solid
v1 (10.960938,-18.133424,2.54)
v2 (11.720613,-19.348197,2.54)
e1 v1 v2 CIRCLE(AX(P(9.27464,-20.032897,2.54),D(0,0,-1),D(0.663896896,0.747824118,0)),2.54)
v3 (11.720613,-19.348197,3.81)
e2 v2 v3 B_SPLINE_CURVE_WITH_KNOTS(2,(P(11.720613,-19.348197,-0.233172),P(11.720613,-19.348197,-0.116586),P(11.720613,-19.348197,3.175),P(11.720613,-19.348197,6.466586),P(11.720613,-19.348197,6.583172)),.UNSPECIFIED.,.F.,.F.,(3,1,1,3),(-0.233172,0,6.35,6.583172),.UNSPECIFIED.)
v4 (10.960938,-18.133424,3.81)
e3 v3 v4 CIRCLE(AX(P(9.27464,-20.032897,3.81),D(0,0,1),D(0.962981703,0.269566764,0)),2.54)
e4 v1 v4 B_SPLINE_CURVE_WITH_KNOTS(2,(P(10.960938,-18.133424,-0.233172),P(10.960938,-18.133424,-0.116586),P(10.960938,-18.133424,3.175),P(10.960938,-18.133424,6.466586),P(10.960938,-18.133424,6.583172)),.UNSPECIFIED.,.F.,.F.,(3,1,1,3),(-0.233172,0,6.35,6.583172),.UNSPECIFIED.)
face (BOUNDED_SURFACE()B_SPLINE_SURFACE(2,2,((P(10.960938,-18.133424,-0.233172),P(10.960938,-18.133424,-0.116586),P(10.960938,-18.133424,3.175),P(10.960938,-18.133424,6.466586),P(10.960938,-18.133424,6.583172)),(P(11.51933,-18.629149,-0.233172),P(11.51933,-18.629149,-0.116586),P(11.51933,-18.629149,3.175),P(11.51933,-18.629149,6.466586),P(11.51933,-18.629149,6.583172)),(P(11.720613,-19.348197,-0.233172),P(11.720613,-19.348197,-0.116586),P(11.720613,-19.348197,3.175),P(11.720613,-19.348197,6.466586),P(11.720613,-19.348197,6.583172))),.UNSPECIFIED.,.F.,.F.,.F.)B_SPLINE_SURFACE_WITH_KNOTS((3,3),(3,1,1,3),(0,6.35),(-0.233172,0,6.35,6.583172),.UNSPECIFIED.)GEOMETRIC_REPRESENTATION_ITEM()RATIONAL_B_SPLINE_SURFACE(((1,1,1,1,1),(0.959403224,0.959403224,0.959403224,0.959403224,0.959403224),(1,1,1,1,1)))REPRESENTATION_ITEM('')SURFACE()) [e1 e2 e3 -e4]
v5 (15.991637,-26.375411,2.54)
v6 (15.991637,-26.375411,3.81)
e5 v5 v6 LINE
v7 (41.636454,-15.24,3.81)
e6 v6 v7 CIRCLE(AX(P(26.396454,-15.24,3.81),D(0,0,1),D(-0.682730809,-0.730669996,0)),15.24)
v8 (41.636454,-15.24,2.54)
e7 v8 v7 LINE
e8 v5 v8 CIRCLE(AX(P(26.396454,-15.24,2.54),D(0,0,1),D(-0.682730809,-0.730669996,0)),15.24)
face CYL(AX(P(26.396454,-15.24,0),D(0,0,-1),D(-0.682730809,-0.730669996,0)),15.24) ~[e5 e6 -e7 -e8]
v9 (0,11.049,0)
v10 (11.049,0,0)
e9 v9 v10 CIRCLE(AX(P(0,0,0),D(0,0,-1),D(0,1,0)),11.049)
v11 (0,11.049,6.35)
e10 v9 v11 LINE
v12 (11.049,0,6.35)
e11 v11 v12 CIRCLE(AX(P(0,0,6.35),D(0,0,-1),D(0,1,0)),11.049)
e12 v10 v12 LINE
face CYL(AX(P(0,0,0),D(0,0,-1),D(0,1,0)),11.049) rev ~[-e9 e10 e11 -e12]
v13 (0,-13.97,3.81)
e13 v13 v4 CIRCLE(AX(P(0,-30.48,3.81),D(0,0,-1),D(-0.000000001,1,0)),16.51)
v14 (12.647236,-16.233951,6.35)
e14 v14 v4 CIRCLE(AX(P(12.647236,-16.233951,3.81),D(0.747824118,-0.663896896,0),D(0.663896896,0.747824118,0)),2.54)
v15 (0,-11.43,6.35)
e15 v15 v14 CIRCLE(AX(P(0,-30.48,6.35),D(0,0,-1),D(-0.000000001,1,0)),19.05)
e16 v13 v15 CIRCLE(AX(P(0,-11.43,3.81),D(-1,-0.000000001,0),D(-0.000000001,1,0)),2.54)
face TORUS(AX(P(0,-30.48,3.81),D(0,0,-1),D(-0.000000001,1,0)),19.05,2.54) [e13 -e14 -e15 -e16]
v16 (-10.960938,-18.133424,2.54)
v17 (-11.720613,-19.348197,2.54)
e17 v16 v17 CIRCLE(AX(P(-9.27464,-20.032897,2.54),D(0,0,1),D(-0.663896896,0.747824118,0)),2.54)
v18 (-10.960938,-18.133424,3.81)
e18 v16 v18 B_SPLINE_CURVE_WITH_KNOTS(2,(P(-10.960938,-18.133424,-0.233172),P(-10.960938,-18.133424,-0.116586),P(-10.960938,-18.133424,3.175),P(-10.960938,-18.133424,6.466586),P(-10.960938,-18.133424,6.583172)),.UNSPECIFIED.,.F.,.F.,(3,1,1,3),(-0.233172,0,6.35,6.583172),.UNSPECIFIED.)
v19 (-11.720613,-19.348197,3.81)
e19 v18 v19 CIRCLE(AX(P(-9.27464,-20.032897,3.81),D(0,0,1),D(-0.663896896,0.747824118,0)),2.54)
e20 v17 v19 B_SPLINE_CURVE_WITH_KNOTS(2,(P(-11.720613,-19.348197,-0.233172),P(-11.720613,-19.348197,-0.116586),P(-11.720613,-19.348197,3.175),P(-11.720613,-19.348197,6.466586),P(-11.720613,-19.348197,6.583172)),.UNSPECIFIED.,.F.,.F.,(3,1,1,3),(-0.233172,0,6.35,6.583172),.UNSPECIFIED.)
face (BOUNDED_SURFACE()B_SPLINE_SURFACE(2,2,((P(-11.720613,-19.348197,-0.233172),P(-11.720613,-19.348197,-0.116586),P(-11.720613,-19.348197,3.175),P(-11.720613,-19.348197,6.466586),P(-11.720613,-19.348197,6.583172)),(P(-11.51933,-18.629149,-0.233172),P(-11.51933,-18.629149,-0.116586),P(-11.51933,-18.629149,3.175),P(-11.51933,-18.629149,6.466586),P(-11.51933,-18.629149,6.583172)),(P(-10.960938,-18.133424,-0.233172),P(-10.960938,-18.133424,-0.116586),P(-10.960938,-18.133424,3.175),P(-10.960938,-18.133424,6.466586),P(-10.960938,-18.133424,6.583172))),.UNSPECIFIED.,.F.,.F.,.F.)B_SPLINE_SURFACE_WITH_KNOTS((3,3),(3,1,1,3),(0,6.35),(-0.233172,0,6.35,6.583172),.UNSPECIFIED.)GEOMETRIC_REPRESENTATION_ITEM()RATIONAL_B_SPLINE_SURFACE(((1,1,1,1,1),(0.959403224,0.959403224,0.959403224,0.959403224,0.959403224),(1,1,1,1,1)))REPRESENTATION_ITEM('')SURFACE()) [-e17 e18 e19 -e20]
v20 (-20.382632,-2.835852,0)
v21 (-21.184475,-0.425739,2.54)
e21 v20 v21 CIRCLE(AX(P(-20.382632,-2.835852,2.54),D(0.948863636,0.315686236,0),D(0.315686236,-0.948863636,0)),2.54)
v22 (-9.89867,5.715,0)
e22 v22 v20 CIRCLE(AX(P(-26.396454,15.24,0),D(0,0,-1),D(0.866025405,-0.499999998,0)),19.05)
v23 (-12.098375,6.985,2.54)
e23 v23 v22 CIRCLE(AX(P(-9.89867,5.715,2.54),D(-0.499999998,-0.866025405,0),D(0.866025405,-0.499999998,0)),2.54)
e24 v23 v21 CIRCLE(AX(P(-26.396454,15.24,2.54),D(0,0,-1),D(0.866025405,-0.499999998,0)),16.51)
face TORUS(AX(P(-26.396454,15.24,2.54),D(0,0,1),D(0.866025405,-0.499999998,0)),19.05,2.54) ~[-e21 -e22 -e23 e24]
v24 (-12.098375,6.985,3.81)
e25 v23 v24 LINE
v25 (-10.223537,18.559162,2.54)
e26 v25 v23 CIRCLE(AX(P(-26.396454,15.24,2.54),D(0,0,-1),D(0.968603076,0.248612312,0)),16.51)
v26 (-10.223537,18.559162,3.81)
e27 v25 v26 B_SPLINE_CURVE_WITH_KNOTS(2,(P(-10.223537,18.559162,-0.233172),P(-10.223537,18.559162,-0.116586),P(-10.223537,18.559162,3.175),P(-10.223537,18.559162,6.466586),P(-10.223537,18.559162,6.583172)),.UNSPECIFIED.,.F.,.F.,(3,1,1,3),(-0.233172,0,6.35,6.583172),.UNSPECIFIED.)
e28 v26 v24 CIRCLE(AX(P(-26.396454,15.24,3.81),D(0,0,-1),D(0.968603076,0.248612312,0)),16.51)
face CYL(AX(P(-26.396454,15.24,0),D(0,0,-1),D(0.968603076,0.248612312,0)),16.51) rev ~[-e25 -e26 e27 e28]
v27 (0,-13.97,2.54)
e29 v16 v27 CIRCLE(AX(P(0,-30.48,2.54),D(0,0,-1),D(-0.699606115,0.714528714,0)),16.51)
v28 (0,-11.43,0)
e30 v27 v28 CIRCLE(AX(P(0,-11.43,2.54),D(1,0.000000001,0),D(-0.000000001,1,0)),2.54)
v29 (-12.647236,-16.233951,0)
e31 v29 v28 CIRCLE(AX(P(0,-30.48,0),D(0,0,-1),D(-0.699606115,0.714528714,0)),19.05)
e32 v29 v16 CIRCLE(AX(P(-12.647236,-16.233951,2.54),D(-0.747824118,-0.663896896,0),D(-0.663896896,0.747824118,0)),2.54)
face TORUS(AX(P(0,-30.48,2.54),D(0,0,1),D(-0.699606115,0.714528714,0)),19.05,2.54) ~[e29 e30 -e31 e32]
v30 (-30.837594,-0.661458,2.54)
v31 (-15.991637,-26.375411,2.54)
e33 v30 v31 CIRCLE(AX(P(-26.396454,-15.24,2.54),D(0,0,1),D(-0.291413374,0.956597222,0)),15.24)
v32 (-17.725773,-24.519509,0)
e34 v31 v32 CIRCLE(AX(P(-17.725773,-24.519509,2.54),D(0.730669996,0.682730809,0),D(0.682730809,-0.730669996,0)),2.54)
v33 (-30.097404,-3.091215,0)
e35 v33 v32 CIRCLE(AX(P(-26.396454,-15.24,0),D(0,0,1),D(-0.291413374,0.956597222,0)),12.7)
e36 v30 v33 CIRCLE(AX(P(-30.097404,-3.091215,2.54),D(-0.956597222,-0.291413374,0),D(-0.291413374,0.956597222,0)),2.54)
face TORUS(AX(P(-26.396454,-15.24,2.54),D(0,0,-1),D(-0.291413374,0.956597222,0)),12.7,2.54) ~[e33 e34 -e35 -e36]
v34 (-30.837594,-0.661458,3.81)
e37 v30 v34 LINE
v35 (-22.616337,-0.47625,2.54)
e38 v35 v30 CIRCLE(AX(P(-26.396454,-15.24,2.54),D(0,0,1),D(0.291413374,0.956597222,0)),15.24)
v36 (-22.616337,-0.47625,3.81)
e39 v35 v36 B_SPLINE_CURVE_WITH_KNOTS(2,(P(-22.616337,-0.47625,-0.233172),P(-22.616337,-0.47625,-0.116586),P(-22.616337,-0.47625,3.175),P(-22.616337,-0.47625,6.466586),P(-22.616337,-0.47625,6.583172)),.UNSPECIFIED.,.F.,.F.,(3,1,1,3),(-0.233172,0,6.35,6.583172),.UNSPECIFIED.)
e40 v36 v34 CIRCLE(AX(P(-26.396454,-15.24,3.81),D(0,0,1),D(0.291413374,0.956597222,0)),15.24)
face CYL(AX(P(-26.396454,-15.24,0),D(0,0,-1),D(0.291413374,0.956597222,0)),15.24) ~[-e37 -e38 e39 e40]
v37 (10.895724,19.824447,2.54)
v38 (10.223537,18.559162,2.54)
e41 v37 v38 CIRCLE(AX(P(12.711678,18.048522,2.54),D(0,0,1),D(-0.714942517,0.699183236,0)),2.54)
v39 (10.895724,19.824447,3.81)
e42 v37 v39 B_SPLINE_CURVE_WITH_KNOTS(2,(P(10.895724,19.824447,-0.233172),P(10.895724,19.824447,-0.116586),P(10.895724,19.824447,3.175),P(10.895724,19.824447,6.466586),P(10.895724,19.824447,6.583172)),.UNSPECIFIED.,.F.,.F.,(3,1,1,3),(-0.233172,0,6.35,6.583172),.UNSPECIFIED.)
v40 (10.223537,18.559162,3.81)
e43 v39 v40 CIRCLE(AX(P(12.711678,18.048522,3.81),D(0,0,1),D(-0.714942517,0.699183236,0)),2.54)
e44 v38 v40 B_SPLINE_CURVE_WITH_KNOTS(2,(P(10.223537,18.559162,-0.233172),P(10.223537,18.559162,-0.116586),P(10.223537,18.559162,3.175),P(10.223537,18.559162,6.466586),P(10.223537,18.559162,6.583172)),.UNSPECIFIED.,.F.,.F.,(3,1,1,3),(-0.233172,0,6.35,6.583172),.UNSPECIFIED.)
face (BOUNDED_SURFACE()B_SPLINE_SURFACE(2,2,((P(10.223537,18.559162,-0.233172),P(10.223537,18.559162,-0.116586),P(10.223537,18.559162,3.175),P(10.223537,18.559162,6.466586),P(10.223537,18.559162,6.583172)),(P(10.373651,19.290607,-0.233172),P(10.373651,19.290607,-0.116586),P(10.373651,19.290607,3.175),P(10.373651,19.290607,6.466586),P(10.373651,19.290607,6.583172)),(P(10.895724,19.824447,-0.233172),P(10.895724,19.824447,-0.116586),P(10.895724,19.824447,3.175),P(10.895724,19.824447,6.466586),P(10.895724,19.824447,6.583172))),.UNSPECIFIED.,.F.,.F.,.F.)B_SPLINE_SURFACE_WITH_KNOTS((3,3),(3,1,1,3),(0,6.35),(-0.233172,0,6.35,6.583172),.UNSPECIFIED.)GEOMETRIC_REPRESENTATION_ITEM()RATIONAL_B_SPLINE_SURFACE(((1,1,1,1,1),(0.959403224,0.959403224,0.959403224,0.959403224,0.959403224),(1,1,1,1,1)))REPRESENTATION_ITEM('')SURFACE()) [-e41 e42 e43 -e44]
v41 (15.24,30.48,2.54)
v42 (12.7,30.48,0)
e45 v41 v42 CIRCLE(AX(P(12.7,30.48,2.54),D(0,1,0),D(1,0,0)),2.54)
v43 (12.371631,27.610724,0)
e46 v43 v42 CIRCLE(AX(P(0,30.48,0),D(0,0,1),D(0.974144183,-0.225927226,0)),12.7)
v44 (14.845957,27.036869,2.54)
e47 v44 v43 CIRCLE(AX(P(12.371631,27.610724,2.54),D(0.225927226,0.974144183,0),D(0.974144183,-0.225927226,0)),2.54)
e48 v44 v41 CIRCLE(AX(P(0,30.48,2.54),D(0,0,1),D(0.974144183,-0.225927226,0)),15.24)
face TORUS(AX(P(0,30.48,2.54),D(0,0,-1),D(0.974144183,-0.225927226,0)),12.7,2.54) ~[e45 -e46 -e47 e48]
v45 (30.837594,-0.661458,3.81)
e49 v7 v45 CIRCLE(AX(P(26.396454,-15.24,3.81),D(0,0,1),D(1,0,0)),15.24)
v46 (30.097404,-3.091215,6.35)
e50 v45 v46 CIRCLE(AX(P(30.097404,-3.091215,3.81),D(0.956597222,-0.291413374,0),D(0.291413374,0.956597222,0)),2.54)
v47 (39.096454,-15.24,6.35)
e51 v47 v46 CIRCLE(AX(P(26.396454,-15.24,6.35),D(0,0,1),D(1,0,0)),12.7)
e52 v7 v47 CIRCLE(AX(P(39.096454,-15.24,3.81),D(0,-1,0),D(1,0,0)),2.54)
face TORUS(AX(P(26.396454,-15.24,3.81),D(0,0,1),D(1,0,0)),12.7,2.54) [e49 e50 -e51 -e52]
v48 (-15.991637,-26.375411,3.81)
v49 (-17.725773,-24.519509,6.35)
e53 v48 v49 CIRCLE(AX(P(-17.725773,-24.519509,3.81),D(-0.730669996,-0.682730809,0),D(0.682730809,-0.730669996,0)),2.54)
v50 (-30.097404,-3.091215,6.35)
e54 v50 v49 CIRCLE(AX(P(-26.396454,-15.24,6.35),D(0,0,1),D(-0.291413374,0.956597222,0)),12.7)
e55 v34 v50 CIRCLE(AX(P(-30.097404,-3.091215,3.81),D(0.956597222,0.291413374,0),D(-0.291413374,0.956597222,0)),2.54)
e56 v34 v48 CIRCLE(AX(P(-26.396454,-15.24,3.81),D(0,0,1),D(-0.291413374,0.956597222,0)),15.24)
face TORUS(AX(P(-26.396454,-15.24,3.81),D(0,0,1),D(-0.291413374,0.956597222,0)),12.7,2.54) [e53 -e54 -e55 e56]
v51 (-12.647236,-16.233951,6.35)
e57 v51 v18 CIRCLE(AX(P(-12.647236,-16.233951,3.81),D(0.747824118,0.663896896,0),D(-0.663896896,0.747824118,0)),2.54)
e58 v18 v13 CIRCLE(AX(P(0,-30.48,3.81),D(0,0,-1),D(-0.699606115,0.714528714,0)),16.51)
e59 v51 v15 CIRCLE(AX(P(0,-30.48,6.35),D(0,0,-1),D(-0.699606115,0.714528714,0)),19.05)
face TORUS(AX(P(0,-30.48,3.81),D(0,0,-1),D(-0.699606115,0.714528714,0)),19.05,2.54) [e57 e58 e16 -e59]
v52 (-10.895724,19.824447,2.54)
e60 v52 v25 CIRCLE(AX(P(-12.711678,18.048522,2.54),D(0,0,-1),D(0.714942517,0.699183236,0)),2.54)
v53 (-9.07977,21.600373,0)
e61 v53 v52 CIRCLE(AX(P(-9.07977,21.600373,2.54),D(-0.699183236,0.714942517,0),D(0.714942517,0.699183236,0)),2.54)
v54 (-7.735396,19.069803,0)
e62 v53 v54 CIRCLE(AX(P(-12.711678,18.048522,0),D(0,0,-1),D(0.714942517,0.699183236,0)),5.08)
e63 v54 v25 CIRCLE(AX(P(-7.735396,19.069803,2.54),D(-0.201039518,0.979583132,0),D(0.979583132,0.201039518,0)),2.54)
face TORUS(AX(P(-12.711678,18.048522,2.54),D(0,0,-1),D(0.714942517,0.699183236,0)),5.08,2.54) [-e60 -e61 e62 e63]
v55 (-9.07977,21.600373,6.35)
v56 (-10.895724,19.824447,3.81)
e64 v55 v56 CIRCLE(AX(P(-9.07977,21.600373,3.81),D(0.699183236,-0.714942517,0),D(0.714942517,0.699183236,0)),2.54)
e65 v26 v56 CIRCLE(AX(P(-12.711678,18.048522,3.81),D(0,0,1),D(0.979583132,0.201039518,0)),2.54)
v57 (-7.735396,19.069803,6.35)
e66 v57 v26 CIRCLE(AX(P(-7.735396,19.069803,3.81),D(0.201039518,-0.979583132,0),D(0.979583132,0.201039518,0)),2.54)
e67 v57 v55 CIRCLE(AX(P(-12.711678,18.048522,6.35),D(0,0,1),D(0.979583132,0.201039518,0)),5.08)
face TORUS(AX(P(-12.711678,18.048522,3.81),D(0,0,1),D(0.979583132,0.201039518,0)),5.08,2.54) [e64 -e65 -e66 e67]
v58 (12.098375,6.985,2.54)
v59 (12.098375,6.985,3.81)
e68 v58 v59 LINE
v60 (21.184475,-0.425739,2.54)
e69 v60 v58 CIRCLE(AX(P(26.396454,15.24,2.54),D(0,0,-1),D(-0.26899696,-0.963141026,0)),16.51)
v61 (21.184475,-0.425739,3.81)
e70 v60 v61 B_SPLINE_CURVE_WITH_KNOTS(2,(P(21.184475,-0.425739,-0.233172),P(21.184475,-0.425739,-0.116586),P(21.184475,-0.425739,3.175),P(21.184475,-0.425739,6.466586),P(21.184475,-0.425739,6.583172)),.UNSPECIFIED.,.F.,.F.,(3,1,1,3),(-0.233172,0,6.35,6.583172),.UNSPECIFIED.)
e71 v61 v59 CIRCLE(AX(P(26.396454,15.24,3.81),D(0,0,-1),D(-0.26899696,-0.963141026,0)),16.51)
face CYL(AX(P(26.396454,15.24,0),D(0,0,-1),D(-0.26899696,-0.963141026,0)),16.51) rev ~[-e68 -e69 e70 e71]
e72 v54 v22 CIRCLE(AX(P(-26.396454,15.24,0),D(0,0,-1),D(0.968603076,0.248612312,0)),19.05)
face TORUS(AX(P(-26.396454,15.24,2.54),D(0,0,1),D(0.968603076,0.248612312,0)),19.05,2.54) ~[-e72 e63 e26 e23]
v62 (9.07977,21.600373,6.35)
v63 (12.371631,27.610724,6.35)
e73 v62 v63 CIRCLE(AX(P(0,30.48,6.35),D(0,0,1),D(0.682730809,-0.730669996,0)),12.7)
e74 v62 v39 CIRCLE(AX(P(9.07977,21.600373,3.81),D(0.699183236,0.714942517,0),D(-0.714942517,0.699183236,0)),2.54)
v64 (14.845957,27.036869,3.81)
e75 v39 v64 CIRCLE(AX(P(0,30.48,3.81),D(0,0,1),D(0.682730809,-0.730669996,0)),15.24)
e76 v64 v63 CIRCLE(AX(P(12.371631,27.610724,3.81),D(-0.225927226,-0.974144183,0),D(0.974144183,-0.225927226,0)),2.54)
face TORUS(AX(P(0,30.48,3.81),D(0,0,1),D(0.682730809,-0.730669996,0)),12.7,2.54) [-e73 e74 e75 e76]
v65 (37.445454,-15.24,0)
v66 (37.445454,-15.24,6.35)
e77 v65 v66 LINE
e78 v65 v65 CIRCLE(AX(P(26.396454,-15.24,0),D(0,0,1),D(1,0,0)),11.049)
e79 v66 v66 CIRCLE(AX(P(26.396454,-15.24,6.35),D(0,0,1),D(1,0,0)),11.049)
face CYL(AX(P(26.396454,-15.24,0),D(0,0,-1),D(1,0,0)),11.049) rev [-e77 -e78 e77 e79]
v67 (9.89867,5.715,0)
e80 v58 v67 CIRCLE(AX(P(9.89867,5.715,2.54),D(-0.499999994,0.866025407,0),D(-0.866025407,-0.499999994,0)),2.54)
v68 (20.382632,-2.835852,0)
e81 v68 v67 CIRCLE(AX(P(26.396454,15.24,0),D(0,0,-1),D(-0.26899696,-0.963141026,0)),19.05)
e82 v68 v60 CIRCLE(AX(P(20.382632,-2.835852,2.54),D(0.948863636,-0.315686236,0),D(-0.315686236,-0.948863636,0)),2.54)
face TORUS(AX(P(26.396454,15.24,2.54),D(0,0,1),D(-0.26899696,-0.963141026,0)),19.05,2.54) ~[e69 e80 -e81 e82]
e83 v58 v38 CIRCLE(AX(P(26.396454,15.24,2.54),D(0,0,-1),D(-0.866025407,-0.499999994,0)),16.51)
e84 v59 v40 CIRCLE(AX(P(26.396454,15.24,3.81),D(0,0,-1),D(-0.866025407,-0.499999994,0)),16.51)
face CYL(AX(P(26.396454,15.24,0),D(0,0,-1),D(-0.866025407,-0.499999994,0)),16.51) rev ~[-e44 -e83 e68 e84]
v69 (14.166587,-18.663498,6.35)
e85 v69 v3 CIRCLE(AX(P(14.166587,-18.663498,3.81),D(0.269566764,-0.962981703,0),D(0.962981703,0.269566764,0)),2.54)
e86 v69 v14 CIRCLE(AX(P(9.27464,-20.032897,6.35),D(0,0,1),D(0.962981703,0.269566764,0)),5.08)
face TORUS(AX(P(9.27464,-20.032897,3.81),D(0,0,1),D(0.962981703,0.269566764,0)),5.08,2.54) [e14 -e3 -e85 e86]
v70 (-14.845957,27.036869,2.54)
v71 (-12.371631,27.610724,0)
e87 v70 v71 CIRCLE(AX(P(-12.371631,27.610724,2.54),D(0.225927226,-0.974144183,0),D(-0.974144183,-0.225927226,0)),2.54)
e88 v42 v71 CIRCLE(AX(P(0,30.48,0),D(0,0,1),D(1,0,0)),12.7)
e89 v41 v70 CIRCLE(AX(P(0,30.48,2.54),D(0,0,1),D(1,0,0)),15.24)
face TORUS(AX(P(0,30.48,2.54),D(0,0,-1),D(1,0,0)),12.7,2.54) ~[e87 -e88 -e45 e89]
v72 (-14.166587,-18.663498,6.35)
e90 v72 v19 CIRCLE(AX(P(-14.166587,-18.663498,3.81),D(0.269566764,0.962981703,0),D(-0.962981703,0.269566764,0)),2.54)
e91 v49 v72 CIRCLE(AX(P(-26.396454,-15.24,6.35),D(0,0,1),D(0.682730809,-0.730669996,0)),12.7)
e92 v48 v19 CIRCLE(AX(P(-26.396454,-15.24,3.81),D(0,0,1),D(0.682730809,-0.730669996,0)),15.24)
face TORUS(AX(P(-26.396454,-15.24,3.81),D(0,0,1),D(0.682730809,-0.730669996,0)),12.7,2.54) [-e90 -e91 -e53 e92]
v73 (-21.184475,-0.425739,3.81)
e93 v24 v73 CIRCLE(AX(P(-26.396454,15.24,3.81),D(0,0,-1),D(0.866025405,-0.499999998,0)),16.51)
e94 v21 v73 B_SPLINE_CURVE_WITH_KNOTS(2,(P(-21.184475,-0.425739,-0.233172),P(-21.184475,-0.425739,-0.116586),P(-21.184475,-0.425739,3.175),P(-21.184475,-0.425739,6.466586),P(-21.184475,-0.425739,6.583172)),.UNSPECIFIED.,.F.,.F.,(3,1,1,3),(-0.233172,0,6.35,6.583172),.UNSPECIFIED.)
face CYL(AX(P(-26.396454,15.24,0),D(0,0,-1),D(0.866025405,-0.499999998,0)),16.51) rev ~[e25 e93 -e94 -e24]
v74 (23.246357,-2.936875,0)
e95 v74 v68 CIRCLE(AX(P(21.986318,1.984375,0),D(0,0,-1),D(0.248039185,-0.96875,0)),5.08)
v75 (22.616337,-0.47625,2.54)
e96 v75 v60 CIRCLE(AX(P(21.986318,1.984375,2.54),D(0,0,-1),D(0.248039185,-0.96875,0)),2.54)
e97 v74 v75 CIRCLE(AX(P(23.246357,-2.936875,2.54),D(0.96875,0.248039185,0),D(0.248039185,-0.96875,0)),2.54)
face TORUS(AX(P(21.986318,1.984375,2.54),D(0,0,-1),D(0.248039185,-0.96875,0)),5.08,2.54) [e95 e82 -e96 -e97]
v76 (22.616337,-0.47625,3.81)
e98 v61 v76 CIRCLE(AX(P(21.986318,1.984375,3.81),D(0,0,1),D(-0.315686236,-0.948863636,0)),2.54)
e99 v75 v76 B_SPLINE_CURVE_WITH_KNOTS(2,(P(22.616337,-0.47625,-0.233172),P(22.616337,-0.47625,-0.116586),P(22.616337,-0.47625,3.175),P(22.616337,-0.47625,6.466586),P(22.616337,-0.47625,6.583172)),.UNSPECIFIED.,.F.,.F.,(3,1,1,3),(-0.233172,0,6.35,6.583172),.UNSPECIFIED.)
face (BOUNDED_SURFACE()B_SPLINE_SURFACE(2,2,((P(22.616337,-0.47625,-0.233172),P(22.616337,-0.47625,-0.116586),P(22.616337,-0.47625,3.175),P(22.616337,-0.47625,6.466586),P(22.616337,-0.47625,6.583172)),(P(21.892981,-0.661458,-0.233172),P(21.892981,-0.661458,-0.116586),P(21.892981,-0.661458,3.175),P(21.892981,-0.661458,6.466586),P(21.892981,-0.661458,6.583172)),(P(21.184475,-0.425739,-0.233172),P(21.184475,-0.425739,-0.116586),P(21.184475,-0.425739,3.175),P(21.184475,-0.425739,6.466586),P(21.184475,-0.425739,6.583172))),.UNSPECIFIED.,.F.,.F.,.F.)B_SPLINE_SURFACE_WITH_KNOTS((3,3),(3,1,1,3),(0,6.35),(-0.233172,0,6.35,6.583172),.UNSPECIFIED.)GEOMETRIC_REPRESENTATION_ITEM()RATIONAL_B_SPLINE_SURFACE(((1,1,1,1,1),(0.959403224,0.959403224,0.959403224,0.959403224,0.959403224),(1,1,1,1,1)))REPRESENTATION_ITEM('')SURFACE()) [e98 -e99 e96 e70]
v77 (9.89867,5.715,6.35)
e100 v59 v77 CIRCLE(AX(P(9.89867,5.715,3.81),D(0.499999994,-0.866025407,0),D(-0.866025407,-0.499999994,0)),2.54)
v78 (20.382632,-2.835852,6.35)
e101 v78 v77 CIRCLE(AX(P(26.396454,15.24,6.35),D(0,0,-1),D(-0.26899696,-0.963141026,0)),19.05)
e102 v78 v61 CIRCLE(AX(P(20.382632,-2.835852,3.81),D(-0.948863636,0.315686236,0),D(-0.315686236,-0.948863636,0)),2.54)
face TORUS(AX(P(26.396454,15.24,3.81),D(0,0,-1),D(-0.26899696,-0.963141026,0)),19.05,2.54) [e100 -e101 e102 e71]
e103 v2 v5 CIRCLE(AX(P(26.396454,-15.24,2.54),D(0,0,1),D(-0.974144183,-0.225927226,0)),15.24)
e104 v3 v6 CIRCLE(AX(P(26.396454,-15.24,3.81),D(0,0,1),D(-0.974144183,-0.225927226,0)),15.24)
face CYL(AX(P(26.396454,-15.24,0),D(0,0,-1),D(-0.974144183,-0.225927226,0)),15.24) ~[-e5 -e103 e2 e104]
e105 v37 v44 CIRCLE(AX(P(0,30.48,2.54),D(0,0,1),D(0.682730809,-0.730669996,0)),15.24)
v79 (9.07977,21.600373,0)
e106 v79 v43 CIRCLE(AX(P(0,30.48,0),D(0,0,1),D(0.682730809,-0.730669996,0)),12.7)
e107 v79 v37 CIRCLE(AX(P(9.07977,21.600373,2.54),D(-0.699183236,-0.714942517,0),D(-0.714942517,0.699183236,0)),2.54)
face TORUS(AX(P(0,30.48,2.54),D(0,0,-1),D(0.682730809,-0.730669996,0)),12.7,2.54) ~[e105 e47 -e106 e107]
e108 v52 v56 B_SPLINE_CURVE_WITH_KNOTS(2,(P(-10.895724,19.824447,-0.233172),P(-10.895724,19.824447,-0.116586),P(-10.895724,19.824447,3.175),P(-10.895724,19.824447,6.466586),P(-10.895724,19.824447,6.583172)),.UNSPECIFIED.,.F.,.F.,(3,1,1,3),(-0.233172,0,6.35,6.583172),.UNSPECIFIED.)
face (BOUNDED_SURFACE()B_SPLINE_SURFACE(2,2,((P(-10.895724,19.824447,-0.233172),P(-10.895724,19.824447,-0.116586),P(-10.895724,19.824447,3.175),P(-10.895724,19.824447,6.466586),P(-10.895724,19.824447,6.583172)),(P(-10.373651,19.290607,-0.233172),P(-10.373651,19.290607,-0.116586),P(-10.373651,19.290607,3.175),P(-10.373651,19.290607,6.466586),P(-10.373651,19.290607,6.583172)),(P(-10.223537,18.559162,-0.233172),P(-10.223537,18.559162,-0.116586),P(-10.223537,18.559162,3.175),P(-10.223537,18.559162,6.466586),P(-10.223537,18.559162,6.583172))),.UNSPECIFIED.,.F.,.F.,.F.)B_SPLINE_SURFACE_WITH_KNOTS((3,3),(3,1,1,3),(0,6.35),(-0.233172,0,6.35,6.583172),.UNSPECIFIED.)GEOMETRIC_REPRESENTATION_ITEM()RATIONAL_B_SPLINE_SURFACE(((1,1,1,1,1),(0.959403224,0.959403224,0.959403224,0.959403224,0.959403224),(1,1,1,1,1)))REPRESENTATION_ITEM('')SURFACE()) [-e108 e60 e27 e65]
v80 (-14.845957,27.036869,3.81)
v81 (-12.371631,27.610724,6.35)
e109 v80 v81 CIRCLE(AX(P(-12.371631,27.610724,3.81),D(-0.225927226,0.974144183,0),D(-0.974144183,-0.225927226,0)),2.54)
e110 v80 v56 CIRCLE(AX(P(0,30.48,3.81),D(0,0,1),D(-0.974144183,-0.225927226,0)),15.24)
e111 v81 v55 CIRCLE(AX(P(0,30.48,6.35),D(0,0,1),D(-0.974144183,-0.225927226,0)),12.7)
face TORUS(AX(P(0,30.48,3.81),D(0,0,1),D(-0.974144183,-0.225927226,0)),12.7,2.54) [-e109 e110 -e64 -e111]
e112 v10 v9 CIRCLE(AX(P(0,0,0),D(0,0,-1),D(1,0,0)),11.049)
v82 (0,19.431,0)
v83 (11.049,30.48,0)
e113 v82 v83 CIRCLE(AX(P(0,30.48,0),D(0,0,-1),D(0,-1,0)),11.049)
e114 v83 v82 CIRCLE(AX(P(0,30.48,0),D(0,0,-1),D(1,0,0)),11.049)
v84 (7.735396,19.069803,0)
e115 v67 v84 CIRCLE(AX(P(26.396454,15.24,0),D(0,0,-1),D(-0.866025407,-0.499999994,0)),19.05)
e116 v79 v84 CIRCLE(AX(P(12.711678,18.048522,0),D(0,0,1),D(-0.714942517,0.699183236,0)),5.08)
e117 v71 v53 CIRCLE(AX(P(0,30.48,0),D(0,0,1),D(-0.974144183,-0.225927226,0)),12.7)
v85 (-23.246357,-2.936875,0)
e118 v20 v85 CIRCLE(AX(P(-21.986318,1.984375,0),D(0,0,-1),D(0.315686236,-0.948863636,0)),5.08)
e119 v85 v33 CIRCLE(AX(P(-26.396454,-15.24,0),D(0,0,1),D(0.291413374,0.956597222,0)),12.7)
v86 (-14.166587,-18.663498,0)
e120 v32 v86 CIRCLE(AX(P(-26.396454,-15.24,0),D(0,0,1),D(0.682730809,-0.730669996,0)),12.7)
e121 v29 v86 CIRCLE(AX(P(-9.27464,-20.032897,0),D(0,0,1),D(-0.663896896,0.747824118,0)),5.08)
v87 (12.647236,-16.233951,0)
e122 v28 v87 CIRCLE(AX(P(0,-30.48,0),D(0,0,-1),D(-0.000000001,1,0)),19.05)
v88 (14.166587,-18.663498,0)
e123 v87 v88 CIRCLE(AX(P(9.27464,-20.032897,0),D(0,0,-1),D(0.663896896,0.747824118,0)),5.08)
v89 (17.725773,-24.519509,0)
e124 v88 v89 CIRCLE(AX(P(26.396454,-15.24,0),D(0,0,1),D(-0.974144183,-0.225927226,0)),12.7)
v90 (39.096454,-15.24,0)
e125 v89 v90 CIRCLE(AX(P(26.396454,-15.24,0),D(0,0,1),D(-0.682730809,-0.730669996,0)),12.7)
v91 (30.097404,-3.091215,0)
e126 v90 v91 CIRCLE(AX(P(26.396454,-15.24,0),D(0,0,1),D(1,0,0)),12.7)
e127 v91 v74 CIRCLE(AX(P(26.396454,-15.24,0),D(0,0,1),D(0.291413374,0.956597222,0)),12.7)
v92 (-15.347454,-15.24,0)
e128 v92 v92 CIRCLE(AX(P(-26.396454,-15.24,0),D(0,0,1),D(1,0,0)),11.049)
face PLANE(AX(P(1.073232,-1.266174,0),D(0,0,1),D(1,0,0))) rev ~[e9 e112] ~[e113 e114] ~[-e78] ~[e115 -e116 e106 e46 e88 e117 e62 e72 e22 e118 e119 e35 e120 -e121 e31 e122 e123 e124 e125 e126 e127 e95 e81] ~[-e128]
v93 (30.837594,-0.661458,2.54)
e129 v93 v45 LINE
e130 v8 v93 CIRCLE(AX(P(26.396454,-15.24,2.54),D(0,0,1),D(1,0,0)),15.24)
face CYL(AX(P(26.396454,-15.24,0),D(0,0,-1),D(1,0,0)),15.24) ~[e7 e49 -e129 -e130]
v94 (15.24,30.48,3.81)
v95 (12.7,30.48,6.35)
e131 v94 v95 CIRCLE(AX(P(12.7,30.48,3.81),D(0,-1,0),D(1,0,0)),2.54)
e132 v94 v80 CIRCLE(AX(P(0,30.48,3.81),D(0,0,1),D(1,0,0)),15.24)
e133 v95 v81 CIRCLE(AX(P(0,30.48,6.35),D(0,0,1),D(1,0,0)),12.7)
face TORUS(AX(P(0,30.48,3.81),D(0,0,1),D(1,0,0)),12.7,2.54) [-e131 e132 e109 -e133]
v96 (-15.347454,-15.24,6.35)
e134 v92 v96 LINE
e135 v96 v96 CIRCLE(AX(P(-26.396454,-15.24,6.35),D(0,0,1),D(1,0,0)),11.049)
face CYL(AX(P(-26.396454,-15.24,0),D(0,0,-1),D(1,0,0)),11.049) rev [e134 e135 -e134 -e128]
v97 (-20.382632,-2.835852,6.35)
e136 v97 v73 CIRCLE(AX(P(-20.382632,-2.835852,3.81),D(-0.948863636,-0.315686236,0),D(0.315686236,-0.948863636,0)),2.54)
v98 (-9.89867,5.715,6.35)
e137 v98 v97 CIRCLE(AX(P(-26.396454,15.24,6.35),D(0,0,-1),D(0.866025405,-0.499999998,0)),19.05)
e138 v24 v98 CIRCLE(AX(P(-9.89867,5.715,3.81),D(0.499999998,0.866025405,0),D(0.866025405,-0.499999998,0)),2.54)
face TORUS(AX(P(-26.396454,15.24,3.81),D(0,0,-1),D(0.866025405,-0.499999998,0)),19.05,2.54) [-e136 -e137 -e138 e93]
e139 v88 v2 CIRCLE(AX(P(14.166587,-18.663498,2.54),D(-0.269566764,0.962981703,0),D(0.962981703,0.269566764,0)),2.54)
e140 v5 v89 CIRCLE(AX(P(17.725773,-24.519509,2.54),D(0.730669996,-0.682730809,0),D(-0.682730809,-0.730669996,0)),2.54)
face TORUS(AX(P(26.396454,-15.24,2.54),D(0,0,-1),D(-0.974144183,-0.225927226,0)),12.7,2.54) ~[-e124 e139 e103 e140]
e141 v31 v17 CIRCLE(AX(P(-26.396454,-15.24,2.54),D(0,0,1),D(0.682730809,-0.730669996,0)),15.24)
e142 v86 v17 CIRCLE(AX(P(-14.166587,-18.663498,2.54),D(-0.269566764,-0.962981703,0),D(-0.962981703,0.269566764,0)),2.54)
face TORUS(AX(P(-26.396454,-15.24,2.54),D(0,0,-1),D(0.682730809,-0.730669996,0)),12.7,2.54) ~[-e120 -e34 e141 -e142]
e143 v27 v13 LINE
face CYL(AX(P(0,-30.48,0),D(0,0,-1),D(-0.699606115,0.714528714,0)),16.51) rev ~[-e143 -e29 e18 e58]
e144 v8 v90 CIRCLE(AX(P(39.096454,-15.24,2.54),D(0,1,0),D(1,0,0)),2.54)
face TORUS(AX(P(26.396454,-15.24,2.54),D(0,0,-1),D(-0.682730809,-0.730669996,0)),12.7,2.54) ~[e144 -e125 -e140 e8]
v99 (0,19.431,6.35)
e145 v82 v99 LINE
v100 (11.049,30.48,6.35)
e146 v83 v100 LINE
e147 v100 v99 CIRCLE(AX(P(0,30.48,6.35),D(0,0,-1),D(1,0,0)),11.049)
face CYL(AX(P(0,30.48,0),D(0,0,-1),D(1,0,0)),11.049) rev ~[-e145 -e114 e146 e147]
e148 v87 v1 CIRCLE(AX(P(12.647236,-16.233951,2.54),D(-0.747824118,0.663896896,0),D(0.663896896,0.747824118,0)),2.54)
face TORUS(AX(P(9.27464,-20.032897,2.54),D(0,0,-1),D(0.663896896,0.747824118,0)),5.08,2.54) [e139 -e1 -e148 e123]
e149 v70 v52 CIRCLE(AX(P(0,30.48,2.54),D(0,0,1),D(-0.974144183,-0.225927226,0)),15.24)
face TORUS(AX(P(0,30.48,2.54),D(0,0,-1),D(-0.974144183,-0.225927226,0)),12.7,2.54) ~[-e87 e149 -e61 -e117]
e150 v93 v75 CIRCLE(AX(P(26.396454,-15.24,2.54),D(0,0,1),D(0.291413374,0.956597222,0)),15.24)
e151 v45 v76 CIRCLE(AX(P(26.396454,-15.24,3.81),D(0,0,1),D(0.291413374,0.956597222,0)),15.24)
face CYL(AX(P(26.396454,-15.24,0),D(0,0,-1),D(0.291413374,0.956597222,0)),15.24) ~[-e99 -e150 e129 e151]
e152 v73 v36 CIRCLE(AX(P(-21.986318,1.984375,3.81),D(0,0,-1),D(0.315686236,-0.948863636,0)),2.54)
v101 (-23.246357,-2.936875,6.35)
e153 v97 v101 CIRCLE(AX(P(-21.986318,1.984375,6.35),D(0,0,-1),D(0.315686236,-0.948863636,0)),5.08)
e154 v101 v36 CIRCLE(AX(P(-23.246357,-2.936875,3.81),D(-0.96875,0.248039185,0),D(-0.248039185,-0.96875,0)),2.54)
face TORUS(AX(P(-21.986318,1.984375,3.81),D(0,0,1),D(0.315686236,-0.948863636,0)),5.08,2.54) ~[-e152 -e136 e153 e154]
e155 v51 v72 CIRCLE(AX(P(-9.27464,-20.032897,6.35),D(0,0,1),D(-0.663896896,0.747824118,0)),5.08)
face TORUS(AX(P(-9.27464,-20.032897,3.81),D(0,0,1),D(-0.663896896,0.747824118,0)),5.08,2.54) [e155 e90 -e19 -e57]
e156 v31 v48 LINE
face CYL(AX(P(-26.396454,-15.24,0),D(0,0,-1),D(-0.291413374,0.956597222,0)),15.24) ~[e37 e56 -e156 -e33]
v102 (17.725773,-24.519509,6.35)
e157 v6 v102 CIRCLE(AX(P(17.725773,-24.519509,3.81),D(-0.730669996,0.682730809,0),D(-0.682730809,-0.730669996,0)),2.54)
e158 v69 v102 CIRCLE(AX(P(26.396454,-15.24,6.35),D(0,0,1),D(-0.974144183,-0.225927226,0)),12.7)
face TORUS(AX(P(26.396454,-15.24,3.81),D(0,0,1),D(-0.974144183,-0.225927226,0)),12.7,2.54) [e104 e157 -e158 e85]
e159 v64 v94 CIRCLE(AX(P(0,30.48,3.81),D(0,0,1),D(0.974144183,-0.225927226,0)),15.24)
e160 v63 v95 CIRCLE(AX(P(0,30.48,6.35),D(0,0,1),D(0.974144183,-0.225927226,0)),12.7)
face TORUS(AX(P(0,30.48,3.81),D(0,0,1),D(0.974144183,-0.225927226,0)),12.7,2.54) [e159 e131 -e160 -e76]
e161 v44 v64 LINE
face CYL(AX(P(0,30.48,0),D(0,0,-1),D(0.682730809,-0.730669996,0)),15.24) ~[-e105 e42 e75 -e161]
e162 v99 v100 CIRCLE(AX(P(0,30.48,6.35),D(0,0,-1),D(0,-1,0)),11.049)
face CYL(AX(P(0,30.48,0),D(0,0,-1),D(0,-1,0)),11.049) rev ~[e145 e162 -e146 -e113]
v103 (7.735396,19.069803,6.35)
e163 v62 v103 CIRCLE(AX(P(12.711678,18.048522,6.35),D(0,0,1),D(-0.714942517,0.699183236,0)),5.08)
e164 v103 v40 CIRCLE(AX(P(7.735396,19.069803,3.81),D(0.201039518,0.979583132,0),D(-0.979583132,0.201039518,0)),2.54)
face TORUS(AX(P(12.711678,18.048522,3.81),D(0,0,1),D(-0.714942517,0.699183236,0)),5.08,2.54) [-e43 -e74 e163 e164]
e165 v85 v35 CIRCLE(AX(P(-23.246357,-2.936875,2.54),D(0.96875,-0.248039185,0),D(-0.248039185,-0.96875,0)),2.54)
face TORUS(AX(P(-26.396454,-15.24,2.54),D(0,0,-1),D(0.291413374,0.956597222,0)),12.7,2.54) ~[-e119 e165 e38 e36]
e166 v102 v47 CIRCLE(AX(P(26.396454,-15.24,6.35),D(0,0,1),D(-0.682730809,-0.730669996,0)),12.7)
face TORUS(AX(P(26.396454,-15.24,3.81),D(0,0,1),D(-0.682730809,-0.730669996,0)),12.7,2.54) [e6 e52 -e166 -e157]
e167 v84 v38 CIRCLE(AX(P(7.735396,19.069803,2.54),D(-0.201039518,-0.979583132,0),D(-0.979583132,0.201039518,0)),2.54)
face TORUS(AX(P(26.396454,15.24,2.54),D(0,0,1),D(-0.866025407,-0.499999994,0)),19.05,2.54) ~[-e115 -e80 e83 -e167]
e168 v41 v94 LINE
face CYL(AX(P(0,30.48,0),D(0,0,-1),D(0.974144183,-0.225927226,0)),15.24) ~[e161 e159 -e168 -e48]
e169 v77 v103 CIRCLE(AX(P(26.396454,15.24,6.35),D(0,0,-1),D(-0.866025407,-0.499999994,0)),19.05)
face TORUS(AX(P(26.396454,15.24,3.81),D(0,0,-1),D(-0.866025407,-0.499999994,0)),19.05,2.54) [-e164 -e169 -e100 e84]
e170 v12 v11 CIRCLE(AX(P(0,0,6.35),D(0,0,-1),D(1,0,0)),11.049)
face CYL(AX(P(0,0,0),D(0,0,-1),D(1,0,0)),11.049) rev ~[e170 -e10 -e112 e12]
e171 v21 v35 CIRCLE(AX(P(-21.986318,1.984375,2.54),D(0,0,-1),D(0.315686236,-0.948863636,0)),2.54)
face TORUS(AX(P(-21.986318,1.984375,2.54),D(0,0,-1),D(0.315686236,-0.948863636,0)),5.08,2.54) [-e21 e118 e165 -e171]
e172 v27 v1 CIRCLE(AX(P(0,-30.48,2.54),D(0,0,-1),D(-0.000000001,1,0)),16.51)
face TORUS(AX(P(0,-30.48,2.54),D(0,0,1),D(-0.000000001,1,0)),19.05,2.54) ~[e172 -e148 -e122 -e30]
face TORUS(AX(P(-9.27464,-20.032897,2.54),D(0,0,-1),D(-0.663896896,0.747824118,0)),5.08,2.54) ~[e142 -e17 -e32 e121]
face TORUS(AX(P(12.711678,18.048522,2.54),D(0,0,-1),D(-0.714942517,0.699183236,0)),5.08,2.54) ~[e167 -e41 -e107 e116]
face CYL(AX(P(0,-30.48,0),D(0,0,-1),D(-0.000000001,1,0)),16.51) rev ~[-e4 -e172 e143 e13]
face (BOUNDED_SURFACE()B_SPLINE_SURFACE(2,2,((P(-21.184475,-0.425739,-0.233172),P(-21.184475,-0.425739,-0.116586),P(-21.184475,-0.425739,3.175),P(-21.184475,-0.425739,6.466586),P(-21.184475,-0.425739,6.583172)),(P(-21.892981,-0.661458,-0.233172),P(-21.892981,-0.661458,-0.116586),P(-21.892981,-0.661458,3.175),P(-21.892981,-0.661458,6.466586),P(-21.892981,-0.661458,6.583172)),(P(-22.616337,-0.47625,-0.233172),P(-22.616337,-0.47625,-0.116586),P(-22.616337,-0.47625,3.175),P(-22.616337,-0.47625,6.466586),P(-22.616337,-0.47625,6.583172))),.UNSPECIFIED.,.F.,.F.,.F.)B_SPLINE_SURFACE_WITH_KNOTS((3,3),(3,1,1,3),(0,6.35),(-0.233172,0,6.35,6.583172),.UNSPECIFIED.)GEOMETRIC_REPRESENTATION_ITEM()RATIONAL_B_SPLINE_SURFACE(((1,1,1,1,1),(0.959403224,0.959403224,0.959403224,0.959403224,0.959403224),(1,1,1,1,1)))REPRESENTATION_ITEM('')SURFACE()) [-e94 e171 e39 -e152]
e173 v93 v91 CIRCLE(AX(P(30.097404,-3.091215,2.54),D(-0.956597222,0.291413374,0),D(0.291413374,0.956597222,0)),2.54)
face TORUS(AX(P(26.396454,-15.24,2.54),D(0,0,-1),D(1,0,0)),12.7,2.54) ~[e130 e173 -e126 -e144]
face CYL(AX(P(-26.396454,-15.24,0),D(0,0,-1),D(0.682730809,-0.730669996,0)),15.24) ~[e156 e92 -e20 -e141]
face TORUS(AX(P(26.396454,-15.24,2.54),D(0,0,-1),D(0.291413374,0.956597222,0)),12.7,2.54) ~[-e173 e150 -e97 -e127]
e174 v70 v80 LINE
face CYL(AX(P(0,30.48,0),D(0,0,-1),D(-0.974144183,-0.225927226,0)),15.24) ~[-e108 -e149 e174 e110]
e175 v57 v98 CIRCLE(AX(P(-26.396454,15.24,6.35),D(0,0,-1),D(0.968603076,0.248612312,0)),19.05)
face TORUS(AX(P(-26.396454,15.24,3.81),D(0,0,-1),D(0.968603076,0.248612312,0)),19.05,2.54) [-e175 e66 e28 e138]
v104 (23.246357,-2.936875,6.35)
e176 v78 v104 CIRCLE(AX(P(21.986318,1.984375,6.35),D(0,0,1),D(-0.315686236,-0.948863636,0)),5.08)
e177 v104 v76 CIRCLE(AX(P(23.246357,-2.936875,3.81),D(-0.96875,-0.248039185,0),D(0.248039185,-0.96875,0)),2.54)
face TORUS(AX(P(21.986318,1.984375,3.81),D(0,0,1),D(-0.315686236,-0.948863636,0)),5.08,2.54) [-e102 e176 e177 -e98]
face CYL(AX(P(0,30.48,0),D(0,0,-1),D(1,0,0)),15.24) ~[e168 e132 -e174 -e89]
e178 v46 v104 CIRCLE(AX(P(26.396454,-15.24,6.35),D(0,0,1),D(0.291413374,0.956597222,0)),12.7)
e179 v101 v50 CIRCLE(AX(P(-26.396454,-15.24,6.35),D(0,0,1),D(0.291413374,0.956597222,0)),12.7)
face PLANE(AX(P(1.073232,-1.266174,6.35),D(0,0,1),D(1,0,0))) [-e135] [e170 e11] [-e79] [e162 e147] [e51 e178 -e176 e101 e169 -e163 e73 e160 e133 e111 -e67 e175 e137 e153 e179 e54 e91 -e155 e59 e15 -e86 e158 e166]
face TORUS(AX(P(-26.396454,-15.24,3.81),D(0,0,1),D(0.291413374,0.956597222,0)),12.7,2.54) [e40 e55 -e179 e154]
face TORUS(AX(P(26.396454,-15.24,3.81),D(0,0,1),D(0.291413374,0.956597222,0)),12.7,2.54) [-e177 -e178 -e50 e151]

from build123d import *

# Parameters (mm, degrees)
F0_R     = 11.049
F1_DEPTH = 6.35
F2_R     = 2.54


with BuildPart() as f1:
    # F0 (on Top) → F1 (new body)
    with BuildSketch(Plane.XY):
        with BuildLine():
            ThreePointArc((0, 11.049), (7.8128228253, 7.8128228253), (11.049, 0))
            ThreePointArc((11.049, 0), (-2.8596916293, -10.6725144547), (-9.5687146864, 5.5245))
            Line((-9.5687146864, 5.5245), (-12.0983748909, 6.985))
            ThreePointArc((-12.0983748733, 6.9850000305), (-12.0983749042, -6.9849999769), (-1.8e-08, -13.97))
            ThreePointArc((-1.8e-08, -13.97), (9.8782817268, -9.8782817395), (13.97, 0))
            ThreePointArc((13.97, 0), (13.4939837796, 3.6157021111), (12.098374838, 6.9850000915))
            ThreePointArc((12.098374838, 6.9850000915), (6.9849999543, 12.0983749173), (0, 13.97))
            Line((0, 13.97), (0, 11.049))
        make_face()
        with BuildLine():
            ThreePointArc((-9.5687146864, 5.5245), (-5.5245, 9.5687146864), (0, 11.049))
            Line((0, 11.049), (0, 13.97))
            ThreePointArc((0, 13.97), (-6.9849999848, 12.0983748997), (-12.0983748733, 6.9850000305))
            Line((-12.0983748909, 6.985), (-9.5687146864, 5.5245))
        make_face()
        with BuildLine():
            Line((0, 15.24), (0, 13.97))
            ThreePointArc((0, 13.97), (6.9849999543, 12.0983749173), (12.098374838, 6.9850000915))
            ThreePointArc((12.098374838, 6.9850000915), (10.0392971957, 12.9986809188), (10.404817525, 19.3445892635))
            ThreePointArc((10.404817525, 19.3445892635), (5.5925817104, 16.3032362715), (0, 15.24))
        make_face()
        with BuildLine():
            ThreePointArc((-12.0983748733, 6.9850000305), (-6.9849999848, 12.0983748997), (0, 13.97))
            Line((0, 13.97), (0, 15.24))
            ThreePointArc((0, 15.24), (-5.5925817104, 16.3032362715), (-10.404817525, 19.3445892635))
            ThreePointArc((-10.404817525, 19.3445892635), (-10.0392972004, 12.9986808839), (-12.0983748733, 6.9850000305))
        make_face()
        with BuildLine():
            ThreePointArc((-1.8e-08, -13.97), (-12.0983749042, -6.9849999769), (-12.0983748733, 6.9850000305))
            ThreePointArc((-12.0983748733, 6.9850000305), (-16.2768364336, 2.1949459914), (-21.9553144904, -0.6614583333))
            ThreePointArc((-21.9553144904, -0.6614583333), (-14.1502187468, -6.1687644394), (-11.1564543073, -15.24))
            ThreePointArc((-11.1564543073, -15.24), (-11.2552854309, -16.9728026589), (-11.5504969654, -18.6831309301))
            ThreePointArc((-11.5504969654, -18.6831309301), (-6.237539253, -15.1936268504), (-1.8e-08, -13.97))
        make_face()
        with BuildLine():
            ThreePointArc((21.9553144904, -0.6614583333), (16.2768364057, 2.1949460129), (12.098374838, 6.9850000915))
            ThreePointArc((12.098374838, 6.9850000915), (13.4939837796, 3.6157021111), (13.97, 0))
            ThreePointArc((13.97, 0), (9.8782817268, -9.8782817395), (-1.8e-08, -13.97))
            ThreePointArc((-1.8e-08, -13.97), (6.2375392363, -15.1936268436), (11.5504969654, -18.6831309301))
            ThreePointArc((11.5504969654, -18.6831309301), (13.1982271537, -7.62), (21.9553144904, -0.6614583333))
        make_face()
        with BuildLine():
            ThreePointArc((-10.404817525, 19.3445892635), (-5.5925817104, 16.3032362715), (0, 15.24))
            ThreePointArc((0, 15.24), (5.5925817104, 16.3032362715), (10.404817525, 19.3445892635))
            ThreePointArc((10.404817525, 19.3445892635), (12.0983748909, 23.495), (14.8459573419, 27.0368690699))
            ThreePointArc((14.8459573419, 27.0368690699), (15.1411688765, 28.7471973411), (15.24, 30.48))
            ThreePointArc((15.24, 30.48), (-1.7328026589, 45.6211688765), (-14.8459573419, 27.0368690699))
            ThreePointArc((-14.8459573419, 27.0368690699), (-12.0983748909, 23.495), (-10.404817525, 19.3445892635))
        make_face()
        with BuildLine():
            ThreePointArc((11.049, 30.48), (7.8128228253, 22.6671771747), (0, 19.431))
            ThreePointArc((0, 19.431), (-7.8128228253, 38.2928228253), (11.049, 30.48))
        make_face(mode=Mode.SUBTRACT)
        with BuildLine():
            ThreePointArc((-30.8375941243, -0.6614583333), (-26.3964543073, -1.27), (-21.9553144904, -0.6614583333))
            ThreePointArc((-21.9553144904, -0.6614583333), (-26.3964543073, 0), (-30.8375941243, -0.6614583333))
        make_face()
        with BuildLine():
            ThreePointArc((-11.1564543073, -15.24), (-14.1502187468, -6.1687644394), (-21.9553144904, -0.6614583333))
            ThreePointArc((-21.9553144904, -0.6614583333), (-26.3964543073, -1.27), (-30.8375941243, -0.6614583333))
            ThreePointArc((-30.8375941243, -0.6614583333), (-39.594681461, -22.86), (-15.9916367823, -26.3754107365))
            ThreePointArc((-15.9916367823, -26.3754107365), (-14.2980794165, -22.225), (-11.5504969654, -18.6831309301))
            ThreePointArc((-11.5504969654, -18.6831309301), (-11.2552854309, -16.9728026589), (-11.1564543073, -15.24))
        make_face()
        with Locations((-26.3964543073, -15.24)):
            Circle(F0_R, mode=Mode.SUBTRACT)
        with BuildLine():
            ThreePointArc((-14.8459573419, 27.0368690699), (-13.1982271537, 22.86), (-10.404817525, 19.3445892635))
            ThreePointArc((-10.404817525, 19.3445892635), (-12.0983748909, 23.495), (-14.8459573419, 27.0368690699))
        make_face()
        with BuildLine():
            ThreePointArc((14.8459573419, 27.0368690699), (12.0983748909, 23.495), (10.404817525, 19.3445892635))
            ThreePointArc((10.404817525, 19.3445892635), (13.1982271537, 22.86), (14.8459573419, 27.0368690699))
        make_face()
        with BuildLine():
            ThreePointArc((30.8375941243, -0.6614583333), (26.3964543073, -1.27), (21.9553144904, -0.6614583333))
            ThreePointArc((21.9553144904, -0.6614583333), (13.1982271537, -7.62), (11.5504969654, -18.6831309301))
            ThreePointArc((11.5504969654, -18.6831309301), (14.2980794165, -22.225), (15.9916367823, -26.3754107365))
            ThreePointArc((15.9916367823, -26.3754107365), (32.4663876232, -29.2190382194), (41.6364543073, -15.24))
            ThreePointArc((41.6364543073, -15.24), (38.6426898679, -6.1687644394), (30.8375941243, -0.6614583333))
        make_face()
        with Locations((26.3964543073, -15.24)):
            Circle(F0_R, mode=Mode.SUBTRACT)
        with BuildLine():
            ThreePointArc((30.8375941243, -0.6614583333), (26.3964543073, 0), (21.9553144904, -0.6614583333))
            ThreePointArc((21.9553144904, -0.6614583333), (26.3964543073, -1.27), (30.8375941243, -0.6614583333))
        make_face()
        with BuildLine():
            ThreePointArc((15.9916367823, -26.3754107365), (14.2980794165, -22.225), (11.5504969654, -18.6831309301))
            ThreePointArc((11.5504969654, -18.6831309301), (13.1982271537, -22.86), (15.9916367823, -26.3754107365))
        make_face()
        with BuildLine():
            ThreePointArc((-15.9916367823, -26.3754107365), (-13.1982271537, -22.86), (-11.5504969654, -18.6831309301))
            ThreePointArc((-11.5504969654, -18.6831309301), (-14.2980794165, -22.225), (-15.9916367823, -26.3754107365))
        make_face()
    extrude(amount=F1_DEPTH)

    # F2
    f2_edges = [f1.edges().sort_by_distance(p)[0] for p in [
        (-12.098375, 6.985, 6.35),
        (0, 45.72, 6.35),
        (12.098375, 6.985, 6.35),
        (39.594681, -22.86, 6.35),
        (0, -13.97, 6.35),
        (-39.594681, -22.86, 6.35),
        (-39.594681, -22.86, 0),
        (-21.955314, -0.661458, 3.175),
        (-11.550497, -18.683131, 3.175),
        (10.404818, 19.344589, 3.175),
        (-10.404818, 19.344589, 3.175),
        (0, 45.72, 0),
        (11.550497, -18.683131, 3.175),
        (0, -13.97, 0),
        (21.955314, -0.661458, 3.175),
        (39.594681, -22.86, 0),
        (-12.098375, 6.985, 0),
        (12.098375, 6.985, 0),
    ]]
    fillet(f2_edges, radius=F2_R)


solid = f1.part
